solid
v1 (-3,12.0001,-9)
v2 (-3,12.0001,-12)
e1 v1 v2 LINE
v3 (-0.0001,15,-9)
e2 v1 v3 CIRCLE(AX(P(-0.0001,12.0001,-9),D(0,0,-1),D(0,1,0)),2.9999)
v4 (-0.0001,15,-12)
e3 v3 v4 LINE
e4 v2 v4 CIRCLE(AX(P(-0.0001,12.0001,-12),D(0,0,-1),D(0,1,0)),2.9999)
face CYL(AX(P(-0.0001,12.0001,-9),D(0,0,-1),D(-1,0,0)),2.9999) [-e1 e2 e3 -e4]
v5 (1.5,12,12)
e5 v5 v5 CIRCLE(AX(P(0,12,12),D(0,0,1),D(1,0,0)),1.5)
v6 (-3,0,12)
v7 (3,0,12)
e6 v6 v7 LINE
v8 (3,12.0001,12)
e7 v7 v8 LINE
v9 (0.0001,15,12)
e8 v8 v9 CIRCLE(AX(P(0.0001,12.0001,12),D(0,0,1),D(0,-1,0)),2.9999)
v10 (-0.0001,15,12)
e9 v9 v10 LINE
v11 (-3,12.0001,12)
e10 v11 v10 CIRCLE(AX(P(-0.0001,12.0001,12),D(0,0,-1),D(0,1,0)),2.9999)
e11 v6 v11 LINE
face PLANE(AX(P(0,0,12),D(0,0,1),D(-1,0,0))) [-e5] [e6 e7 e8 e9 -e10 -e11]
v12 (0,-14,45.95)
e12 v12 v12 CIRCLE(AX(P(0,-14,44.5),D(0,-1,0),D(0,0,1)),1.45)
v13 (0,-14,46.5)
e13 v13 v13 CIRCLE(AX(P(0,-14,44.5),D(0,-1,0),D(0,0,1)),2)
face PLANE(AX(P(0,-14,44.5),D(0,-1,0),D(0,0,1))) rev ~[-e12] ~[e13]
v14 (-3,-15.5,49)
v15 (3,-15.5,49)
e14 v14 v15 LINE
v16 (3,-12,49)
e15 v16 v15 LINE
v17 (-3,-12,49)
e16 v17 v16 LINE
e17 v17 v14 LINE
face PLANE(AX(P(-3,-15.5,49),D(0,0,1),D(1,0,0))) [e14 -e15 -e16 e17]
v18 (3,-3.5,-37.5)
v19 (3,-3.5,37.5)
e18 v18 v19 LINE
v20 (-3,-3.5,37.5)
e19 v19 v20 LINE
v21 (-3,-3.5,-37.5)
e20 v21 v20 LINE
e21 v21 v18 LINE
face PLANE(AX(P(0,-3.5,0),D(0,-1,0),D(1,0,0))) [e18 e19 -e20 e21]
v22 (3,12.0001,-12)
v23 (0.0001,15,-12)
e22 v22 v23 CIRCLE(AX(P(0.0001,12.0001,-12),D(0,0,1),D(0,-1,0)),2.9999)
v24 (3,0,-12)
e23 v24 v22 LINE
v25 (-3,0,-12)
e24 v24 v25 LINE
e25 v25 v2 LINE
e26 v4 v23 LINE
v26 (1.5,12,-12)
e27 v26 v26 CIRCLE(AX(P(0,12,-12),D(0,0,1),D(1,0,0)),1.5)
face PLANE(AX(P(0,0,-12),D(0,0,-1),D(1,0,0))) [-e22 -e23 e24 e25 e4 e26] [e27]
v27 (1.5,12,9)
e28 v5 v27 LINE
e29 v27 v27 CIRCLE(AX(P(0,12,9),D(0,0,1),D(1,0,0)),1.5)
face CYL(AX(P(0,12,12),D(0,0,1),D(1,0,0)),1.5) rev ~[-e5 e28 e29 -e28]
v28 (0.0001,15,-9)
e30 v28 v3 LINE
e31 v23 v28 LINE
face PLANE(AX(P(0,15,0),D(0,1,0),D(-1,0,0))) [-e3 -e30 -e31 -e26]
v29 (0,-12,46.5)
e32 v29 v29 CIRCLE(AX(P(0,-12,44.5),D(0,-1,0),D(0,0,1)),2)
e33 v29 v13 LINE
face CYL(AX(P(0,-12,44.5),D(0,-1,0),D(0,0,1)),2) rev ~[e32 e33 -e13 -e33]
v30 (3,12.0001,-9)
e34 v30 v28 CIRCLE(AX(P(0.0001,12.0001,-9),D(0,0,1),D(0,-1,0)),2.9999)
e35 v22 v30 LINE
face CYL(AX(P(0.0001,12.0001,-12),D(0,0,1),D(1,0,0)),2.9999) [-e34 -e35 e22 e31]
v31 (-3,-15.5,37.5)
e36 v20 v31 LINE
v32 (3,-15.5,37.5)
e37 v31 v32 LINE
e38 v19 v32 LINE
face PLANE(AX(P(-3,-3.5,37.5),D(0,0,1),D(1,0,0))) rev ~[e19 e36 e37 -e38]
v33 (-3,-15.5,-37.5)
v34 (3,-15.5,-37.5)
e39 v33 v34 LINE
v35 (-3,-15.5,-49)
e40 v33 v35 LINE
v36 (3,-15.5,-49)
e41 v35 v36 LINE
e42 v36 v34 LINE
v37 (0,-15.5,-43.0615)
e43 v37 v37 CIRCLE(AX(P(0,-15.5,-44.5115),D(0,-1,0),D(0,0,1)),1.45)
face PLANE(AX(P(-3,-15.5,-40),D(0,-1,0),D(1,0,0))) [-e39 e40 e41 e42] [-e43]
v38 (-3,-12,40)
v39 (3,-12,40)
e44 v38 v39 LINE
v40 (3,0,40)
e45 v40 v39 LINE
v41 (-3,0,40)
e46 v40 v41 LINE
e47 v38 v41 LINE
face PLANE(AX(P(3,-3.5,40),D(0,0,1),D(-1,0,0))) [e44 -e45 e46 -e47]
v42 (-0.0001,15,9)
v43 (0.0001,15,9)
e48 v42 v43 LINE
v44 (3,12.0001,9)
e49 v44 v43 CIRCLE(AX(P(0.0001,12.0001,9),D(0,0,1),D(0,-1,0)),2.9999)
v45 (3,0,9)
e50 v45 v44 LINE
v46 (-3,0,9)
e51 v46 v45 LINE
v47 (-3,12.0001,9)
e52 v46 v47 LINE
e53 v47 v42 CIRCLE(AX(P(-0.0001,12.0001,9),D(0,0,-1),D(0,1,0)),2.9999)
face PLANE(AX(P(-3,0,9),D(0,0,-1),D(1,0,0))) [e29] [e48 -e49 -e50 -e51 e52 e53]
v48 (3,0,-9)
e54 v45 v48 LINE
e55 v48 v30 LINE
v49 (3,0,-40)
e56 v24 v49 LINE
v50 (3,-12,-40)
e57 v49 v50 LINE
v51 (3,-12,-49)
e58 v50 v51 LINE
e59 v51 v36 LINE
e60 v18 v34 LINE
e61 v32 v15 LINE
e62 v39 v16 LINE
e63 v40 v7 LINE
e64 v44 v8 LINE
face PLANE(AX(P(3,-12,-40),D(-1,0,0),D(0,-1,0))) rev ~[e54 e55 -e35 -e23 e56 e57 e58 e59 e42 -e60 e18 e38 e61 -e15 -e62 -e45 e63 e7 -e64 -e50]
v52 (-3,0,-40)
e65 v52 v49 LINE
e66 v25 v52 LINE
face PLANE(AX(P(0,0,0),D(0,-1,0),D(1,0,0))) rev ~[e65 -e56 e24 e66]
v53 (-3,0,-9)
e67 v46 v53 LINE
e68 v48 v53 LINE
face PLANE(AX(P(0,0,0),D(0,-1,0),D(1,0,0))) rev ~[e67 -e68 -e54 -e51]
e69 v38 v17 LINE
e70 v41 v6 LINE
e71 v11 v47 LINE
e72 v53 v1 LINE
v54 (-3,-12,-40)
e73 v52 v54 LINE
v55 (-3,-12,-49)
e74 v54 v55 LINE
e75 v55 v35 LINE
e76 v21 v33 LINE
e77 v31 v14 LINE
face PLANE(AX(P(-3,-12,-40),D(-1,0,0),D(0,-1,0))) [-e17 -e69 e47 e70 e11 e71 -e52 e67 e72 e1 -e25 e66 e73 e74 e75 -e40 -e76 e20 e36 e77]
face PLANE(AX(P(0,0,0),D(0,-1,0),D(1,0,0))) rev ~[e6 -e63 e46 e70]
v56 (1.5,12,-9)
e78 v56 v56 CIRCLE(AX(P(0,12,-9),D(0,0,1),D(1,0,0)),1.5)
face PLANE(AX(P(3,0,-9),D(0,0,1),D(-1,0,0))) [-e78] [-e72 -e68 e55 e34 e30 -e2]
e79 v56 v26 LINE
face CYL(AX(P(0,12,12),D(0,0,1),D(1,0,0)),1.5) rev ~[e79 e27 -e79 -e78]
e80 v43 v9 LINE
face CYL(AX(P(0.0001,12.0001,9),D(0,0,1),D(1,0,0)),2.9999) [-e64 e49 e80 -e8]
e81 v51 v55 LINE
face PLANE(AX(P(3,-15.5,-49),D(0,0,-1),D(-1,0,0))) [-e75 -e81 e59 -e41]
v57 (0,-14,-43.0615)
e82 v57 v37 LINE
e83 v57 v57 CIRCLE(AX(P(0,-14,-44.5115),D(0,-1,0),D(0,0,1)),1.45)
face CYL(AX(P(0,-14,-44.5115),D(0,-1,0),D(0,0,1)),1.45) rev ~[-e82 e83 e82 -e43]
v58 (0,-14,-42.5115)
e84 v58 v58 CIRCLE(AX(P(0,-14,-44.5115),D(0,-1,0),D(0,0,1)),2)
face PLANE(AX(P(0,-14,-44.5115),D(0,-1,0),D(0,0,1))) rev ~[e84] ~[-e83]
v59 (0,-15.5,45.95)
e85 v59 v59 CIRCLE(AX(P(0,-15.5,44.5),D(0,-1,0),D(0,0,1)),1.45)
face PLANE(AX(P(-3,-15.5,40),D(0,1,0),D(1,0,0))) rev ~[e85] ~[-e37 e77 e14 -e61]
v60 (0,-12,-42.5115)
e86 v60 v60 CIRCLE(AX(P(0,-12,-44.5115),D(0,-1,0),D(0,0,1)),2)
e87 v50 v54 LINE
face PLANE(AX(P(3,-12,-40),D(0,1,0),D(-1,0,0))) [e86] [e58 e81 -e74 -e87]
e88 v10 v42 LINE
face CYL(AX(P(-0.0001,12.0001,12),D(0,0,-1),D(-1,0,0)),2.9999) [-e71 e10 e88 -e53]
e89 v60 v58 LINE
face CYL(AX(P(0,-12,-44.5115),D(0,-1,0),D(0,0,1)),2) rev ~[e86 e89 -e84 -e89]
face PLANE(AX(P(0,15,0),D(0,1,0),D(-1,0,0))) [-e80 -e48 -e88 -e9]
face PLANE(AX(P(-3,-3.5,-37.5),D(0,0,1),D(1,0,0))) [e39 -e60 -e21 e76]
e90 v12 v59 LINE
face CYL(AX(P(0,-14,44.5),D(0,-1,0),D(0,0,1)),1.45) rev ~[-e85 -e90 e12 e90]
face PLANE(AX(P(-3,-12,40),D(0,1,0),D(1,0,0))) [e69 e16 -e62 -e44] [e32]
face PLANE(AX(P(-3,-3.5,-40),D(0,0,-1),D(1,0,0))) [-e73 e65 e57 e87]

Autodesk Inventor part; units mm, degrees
ref_plane "YZ Plane" through (0, 0, 0) normal (1, 0, 0) x (0, 1, 0)
ref_plane "XZ Plane" through (0, 0, 0) normal (0, 1, 0) x (-1, 0, 0)
ref_plane "XY Plane" through (0, 0, 0) normal (0, 0, 1) x (1, 0, 0)
sketch "Boceto1" plane through (0, 0, 0) normal (0, 1, 0) x (-1, 0, 0)
  line L0 (0, 12) -> (-3, 12)
  line L1 (-3, 12) -> (0, 12)
  line L2 (0, 12) -> (3, 12)
  line L3 (3, 12) -> (3, 9)
  line L4 (3, 9) -> (-3, 9)
  line L5 (-3, 9) -> (-3, 12)
  line L6 (0, -12) -> (-3, -12)
  line L7 (-3, -12) -> (-3, -9)
  line L8 (-3, -9) -> (3, -9)
  line L9 (3, -9) -> (3, -12)
  line L10 (3, -12) -> (-3, -12)
  point P0 (0, 0)
extrude "Extrusión1" add sketch "Boceto1" along normal blind 15
fillet "Empalme1" radius 3 4 edges at (3, 15, 10.5) (-3, 15, 10.5) (3, 15, -10.5) (-3, 15, -10.5)
sketch "Boceto2" plane through (0, 0, 0) normal (0, -1, 0) x (1, 0, 0)
  line L0 (-3, 9) -> (-3, 12) projected
  line L1 (3, -9) -> (3, -12) projected
  line L2 (-3, 12) -> (3, 12)
  line L3 (3, 12) -> (3, -12)
  line L4 (3, -12) -> (-3, -12)
  line L5 (-3, -12) -> (-3, 12)
  line L6 (3, 0) -> (3, -37.5)
  line L7 (3, 0) -> (3, 37.5)
  line L8 (3, 37.5) -> (-3, 37.5)
  line L9 (-3, 37.5) -> (-3, -37.5)
  line L10 (-3, -37.5) -> (3, -37.5)
  point P0 (0, 0)
  dimension "d11" = 37.5
  dimension "d12" = 37.5
extrude "Extrusión2" add sketch "Boceto2" along normal blind 3.5
sketch "Boceto3" plane through (0, -3.5, 0) normal (0, -1, 0) x (1, 0, 0)
  line L0 (-3, 37.5) -> (-3, -37.5) projected
  line L1 (3, -37.5) -> (3, 37.5) projected
  line L2 (-3, 37.5) -> (3, 37.5)
  line L3 (3, 37.5) -> (3, 40)
  line L4 (3, 40) -> (-3, 40)
  line L5 (-3, 40) -> (-3, 37.5)
  line L6 (-3, -37.5) -> (3, -37.5)
  line L7 (3, -37.5) -> (3, -40)
  line L8 (3, -40) -> (-3, -40)
  line L9 (-3, -40) -> (-3, -37.5)
  point P0 (0, 0)
  dimension "d15" = 2.5
  dimension "d16" = 2.5
extrude "Extrusión3" add sketch "Boceto3" along normal blind 12 contours L5 L4 L3 L2 | L6 L7 L8 L9
sketch "Boceto4" plane through (0, -3.5, 0) normal (0, 1, 0) x (1, 0, 0)
  line L0 (3, -40) -> (-3, -40) projected
  line L1 (3, 37.5) -> (3, -37.5) projected
  line L2 (-3, -40) -> (3, -40)
  line L3 (3, -40) -> (3, -37.5)
  line L4 (3, -37.5) -> (-3, -37.5)
  line L5 (-3, -37.5) -> (-3, -40)
  line L6 (-3, -37.5) -> (-3, 37.5) projected
  line L7 (-3, 40) -> (3, 40) projected
  line L8 (-3, 37.5) -> (3, 37.5)
  line L9 (3, 37.5) -> (3, 40)
  line L10 (3, 40) -> (-3, 40)
  line L11 (-3, 40) -> (-3, 37.5)
  point P0 (0, 0)
extrude "Extrusión4" add sketch "Boceto4" along normal blind 3.5 contours L0 L5 L4 L3 | L8 L11 L7 L9
sketch "Boceto5" plane through (-3, -15.5, 40) normal (0, 0, 1) x (1, 0, 0)
  line L0 (0, 0) -> (6, 0) projected
  line L1 (0, 15.5) -> (0, 0) projected
  line L2 (6, 0) -> (0, 0)
  line L3 (0, 0) -> (0, 3.5)
  line L4 (0, 3.5) -> (6, 3.5)
  line L5 (6, 3.5) -> (6, 0)
  point P0 (3, 15.5)
  dimension "d21" = 3.5
extrude "Extrusión5" add sketch "Boceto5" along normal blind 9
sketch "Boceto6" plane through (3, -15.5, -40) normal (0, 0, -1) x (-1, 0, 0)
  line L0 (6, 0) -> (0, 0) projected
  line L1 (0, 12) -> (0, 0) projected
  line L2 (6, 0) -> (0, 0)
  line L3 (0, 0) -> (0, 3.5)
  line L4 (0, 3.5) -> (6, 3.5)
  line L5 (6, 3.5) -> (6, 0)
  point P0 (3, 15.5)
  dimension "d24" = 3.5
extrude "Extrusión6" add sketch "Boceto6" along normal blind 9
sketch "Boceto7" plane through (0, 12, 12) normal (0, 0, 1) x (1, 0, 0)
  circle A0 centre (0, 0) radius 1.5
  point P0 (0, -12)
  dimension "d27" = 3
extrude "Extrusión7" cut sketch "Boceto7" against normal blind 31.25
sketch "Boceto8" plane through (-3, -12, 40) normal (0, 1, 0) x (1, 0, 0)
  line L0 (0, -9) -> (6, -9) projected
  line L1 (3, -9) -> (3, 0)
  line L2 (0, 0) -> (6, 0) projected
  line L3 (3, -4.5) -> (4.913, -4.5)
  line L4 (6, 80) -> (0, 80) projected
  line L5 (3, 80) -> (3, 89.023)
  line L6 (3, 84.5115) -> (4.913, 84.5115)
  point P0 (3, 40)
hole "Agujero1" at (0, -12, -44.5115) at (0, -12, 44.5) direction (0, -1, 0) diameter 2.9 depth 10 counterbore diameter 4 counterbore depth 2
properties part number "ventilador emergència inferior"
